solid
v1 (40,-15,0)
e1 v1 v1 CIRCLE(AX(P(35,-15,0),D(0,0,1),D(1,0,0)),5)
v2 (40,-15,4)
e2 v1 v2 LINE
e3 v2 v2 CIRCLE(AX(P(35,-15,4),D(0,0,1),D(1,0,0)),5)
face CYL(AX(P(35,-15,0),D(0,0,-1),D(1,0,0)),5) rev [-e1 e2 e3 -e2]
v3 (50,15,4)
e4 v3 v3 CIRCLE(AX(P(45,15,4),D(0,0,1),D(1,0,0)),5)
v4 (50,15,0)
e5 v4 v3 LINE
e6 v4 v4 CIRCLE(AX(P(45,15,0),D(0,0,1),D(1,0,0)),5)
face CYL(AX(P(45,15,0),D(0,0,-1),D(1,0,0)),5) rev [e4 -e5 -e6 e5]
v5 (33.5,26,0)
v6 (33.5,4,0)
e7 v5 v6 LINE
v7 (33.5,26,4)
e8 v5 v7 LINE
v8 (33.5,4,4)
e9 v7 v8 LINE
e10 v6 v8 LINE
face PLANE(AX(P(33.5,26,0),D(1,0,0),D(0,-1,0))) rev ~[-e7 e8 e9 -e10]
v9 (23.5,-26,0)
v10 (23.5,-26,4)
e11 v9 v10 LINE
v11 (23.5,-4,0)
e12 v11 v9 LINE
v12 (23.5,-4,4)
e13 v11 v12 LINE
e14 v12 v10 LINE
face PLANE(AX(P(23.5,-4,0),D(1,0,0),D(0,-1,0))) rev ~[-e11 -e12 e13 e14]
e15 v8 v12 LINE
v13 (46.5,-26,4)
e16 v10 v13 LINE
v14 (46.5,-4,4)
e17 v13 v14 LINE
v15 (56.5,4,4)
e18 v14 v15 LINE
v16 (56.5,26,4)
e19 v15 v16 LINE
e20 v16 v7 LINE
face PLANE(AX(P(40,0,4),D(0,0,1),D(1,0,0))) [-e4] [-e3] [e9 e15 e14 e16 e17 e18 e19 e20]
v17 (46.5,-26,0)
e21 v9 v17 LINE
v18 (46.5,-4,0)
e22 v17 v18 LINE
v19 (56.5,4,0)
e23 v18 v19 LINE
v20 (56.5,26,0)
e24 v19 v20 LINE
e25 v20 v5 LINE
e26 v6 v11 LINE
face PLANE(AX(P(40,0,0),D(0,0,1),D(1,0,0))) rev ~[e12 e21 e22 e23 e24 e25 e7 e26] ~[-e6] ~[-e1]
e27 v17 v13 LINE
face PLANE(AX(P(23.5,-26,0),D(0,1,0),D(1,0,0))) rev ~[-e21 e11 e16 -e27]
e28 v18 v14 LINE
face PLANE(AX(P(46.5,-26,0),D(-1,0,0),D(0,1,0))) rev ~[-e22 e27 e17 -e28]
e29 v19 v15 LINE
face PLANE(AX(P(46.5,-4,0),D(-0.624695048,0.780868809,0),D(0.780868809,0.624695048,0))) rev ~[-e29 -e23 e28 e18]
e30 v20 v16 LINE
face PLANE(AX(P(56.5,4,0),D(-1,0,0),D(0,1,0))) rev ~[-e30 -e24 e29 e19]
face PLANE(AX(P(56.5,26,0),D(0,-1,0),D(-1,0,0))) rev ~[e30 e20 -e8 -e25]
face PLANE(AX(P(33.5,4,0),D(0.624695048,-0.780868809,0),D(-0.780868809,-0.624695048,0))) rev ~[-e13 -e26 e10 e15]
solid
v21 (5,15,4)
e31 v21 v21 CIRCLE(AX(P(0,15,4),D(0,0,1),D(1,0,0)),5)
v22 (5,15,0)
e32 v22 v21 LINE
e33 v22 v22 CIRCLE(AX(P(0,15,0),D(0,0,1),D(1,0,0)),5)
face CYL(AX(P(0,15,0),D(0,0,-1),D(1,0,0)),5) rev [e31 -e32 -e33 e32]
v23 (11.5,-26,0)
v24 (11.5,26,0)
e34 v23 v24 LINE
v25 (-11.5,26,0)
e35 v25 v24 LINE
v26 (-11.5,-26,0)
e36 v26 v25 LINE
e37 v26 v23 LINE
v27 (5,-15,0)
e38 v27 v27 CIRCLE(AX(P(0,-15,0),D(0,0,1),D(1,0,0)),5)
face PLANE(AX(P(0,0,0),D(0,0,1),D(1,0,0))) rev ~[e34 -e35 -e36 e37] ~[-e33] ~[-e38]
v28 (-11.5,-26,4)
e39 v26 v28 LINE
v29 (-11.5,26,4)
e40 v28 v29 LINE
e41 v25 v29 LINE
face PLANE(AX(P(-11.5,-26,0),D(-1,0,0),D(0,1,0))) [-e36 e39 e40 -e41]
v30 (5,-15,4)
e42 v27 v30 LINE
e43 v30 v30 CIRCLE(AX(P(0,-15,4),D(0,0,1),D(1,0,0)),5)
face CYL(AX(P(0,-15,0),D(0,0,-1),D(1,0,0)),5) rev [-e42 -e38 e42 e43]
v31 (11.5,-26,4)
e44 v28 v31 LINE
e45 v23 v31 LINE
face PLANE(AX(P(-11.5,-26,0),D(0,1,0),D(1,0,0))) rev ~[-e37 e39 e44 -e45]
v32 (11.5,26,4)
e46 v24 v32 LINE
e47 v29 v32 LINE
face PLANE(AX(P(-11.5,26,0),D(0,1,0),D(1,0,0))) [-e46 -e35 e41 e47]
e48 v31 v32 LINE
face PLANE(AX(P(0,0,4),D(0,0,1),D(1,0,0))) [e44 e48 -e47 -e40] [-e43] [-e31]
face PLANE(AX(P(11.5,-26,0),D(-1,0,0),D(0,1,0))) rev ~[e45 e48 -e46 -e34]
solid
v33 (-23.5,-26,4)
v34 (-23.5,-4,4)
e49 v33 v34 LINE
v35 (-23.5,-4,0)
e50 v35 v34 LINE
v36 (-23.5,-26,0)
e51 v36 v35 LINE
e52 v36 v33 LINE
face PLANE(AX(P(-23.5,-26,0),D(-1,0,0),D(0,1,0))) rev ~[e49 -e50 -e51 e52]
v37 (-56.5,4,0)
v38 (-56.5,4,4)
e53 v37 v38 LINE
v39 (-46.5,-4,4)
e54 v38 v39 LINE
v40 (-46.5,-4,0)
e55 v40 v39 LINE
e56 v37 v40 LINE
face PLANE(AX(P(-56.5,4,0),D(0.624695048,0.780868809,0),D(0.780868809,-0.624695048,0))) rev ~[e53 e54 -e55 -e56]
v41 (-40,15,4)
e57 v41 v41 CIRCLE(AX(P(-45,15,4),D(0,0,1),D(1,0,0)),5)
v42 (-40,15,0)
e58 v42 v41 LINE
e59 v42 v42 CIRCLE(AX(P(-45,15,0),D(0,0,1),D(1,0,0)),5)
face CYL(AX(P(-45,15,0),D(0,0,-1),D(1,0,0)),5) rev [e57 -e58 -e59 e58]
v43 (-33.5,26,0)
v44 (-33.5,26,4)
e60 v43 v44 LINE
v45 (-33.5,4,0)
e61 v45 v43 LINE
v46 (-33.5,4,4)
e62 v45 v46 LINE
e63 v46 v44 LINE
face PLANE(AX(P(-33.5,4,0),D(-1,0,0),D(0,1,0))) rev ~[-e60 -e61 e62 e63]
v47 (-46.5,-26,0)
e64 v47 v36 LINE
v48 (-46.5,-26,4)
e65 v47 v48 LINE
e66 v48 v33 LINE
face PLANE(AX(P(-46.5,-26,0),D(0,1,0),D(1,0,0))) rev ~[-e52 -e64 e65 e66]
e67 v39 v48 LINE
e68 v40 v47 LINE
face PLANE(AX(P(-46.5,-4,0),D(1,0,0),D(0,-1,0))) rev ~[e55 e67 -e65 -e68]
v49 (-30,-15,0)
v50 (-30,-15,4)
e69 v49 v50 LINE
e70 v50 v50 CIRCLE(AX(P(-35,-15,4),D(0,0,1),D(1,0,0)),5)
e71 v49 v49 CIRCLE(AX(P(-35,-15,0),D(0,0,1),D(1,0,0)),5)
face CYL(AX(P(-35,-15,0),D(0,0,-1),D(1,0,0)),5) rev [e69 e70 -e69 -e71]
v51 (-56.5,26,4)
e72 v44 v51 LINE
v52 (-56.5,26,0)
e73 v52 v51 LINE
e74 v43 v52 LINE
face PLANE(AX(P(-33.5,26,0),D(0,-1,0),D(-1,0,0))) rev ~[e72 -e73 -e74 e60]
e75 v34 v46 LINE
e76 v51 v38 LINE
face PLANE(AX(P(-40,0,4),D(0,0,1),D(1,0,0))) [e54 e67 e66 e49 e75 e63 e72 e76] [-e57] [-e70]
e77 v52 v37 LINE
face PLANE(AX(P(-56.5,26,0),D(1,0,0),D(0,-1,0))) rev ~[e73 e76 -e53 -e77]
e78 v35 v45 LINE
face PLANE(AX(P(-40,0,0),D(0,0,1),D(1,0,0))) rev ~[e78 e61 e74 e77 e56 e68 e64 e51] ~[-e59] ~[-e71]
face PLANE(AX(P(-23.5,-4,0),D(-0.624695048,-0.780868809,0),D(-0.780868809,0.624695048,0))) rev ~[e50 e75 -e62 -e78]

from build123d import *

# Parameters (mm, degrees)
F0_R     = 5
F1_DEPTH = 4
F0_W     = 23
F0_H     = 52


# Not quite as in the source:
# - a feature names something its author has since deleted; it is built from what else it names


with BuildPart() as f1:
    # F0 (on Top) → F1 (new body)
    with BuildSketch(Plane.XY):
        Polygon((-46.5, -26), (-23.5, -26), (-23.5, -4), (-33.5, 4), (-33.5, 26), (-56.5, 26), (-56.5, 4), (-46.5, -4), align=None)
        with Locations((-35, -15)):
            Circle(F0_R, mode=Mode.SUBTRACT)
        with Locations((-45, 15)):
            Circle(F0_R, mode=Mode.SUBTRACT)
    extrude(amount=F1_DEPTH)


with BuildPart() as f1b:
    # F0 (on Top) → F1, piece 2 (new body)
    with BuildSketch(Plane.XY):
        Rectangle(F0_W, F0_H)
        with Locations((0, -15)):
            Circle(F0_R, mode=Mode.SUBTRACT)
        with Locations((0, 15)):
            Circle(F0_R, mode=Mode.SUBTRACT)
    extrude(amount=F1_DEPTH)


with BuildPart() as f1c:
    # F0 (on Top) → F1, piece 3 (new body)
    with BuildSketch(Plane.XY):
        Polygon((56.5, 4), (56.5, 26), (33.5, 26), (33.5, 4), (23.5, -4), (23.5, -26), (46.5, -26), (46.5, -4), align=None)
        with Locations((35, -15)):
            Circle(F0_R, mode=Mode.SUBTRACT)
        with Locations((45, 15)):
            Circle(F0_R, mode=Mode.SUBTRACT)
    extrude(amount=F1_DEPTH)


solid = Compound([f1.part, f1b.part, f1c.part])
